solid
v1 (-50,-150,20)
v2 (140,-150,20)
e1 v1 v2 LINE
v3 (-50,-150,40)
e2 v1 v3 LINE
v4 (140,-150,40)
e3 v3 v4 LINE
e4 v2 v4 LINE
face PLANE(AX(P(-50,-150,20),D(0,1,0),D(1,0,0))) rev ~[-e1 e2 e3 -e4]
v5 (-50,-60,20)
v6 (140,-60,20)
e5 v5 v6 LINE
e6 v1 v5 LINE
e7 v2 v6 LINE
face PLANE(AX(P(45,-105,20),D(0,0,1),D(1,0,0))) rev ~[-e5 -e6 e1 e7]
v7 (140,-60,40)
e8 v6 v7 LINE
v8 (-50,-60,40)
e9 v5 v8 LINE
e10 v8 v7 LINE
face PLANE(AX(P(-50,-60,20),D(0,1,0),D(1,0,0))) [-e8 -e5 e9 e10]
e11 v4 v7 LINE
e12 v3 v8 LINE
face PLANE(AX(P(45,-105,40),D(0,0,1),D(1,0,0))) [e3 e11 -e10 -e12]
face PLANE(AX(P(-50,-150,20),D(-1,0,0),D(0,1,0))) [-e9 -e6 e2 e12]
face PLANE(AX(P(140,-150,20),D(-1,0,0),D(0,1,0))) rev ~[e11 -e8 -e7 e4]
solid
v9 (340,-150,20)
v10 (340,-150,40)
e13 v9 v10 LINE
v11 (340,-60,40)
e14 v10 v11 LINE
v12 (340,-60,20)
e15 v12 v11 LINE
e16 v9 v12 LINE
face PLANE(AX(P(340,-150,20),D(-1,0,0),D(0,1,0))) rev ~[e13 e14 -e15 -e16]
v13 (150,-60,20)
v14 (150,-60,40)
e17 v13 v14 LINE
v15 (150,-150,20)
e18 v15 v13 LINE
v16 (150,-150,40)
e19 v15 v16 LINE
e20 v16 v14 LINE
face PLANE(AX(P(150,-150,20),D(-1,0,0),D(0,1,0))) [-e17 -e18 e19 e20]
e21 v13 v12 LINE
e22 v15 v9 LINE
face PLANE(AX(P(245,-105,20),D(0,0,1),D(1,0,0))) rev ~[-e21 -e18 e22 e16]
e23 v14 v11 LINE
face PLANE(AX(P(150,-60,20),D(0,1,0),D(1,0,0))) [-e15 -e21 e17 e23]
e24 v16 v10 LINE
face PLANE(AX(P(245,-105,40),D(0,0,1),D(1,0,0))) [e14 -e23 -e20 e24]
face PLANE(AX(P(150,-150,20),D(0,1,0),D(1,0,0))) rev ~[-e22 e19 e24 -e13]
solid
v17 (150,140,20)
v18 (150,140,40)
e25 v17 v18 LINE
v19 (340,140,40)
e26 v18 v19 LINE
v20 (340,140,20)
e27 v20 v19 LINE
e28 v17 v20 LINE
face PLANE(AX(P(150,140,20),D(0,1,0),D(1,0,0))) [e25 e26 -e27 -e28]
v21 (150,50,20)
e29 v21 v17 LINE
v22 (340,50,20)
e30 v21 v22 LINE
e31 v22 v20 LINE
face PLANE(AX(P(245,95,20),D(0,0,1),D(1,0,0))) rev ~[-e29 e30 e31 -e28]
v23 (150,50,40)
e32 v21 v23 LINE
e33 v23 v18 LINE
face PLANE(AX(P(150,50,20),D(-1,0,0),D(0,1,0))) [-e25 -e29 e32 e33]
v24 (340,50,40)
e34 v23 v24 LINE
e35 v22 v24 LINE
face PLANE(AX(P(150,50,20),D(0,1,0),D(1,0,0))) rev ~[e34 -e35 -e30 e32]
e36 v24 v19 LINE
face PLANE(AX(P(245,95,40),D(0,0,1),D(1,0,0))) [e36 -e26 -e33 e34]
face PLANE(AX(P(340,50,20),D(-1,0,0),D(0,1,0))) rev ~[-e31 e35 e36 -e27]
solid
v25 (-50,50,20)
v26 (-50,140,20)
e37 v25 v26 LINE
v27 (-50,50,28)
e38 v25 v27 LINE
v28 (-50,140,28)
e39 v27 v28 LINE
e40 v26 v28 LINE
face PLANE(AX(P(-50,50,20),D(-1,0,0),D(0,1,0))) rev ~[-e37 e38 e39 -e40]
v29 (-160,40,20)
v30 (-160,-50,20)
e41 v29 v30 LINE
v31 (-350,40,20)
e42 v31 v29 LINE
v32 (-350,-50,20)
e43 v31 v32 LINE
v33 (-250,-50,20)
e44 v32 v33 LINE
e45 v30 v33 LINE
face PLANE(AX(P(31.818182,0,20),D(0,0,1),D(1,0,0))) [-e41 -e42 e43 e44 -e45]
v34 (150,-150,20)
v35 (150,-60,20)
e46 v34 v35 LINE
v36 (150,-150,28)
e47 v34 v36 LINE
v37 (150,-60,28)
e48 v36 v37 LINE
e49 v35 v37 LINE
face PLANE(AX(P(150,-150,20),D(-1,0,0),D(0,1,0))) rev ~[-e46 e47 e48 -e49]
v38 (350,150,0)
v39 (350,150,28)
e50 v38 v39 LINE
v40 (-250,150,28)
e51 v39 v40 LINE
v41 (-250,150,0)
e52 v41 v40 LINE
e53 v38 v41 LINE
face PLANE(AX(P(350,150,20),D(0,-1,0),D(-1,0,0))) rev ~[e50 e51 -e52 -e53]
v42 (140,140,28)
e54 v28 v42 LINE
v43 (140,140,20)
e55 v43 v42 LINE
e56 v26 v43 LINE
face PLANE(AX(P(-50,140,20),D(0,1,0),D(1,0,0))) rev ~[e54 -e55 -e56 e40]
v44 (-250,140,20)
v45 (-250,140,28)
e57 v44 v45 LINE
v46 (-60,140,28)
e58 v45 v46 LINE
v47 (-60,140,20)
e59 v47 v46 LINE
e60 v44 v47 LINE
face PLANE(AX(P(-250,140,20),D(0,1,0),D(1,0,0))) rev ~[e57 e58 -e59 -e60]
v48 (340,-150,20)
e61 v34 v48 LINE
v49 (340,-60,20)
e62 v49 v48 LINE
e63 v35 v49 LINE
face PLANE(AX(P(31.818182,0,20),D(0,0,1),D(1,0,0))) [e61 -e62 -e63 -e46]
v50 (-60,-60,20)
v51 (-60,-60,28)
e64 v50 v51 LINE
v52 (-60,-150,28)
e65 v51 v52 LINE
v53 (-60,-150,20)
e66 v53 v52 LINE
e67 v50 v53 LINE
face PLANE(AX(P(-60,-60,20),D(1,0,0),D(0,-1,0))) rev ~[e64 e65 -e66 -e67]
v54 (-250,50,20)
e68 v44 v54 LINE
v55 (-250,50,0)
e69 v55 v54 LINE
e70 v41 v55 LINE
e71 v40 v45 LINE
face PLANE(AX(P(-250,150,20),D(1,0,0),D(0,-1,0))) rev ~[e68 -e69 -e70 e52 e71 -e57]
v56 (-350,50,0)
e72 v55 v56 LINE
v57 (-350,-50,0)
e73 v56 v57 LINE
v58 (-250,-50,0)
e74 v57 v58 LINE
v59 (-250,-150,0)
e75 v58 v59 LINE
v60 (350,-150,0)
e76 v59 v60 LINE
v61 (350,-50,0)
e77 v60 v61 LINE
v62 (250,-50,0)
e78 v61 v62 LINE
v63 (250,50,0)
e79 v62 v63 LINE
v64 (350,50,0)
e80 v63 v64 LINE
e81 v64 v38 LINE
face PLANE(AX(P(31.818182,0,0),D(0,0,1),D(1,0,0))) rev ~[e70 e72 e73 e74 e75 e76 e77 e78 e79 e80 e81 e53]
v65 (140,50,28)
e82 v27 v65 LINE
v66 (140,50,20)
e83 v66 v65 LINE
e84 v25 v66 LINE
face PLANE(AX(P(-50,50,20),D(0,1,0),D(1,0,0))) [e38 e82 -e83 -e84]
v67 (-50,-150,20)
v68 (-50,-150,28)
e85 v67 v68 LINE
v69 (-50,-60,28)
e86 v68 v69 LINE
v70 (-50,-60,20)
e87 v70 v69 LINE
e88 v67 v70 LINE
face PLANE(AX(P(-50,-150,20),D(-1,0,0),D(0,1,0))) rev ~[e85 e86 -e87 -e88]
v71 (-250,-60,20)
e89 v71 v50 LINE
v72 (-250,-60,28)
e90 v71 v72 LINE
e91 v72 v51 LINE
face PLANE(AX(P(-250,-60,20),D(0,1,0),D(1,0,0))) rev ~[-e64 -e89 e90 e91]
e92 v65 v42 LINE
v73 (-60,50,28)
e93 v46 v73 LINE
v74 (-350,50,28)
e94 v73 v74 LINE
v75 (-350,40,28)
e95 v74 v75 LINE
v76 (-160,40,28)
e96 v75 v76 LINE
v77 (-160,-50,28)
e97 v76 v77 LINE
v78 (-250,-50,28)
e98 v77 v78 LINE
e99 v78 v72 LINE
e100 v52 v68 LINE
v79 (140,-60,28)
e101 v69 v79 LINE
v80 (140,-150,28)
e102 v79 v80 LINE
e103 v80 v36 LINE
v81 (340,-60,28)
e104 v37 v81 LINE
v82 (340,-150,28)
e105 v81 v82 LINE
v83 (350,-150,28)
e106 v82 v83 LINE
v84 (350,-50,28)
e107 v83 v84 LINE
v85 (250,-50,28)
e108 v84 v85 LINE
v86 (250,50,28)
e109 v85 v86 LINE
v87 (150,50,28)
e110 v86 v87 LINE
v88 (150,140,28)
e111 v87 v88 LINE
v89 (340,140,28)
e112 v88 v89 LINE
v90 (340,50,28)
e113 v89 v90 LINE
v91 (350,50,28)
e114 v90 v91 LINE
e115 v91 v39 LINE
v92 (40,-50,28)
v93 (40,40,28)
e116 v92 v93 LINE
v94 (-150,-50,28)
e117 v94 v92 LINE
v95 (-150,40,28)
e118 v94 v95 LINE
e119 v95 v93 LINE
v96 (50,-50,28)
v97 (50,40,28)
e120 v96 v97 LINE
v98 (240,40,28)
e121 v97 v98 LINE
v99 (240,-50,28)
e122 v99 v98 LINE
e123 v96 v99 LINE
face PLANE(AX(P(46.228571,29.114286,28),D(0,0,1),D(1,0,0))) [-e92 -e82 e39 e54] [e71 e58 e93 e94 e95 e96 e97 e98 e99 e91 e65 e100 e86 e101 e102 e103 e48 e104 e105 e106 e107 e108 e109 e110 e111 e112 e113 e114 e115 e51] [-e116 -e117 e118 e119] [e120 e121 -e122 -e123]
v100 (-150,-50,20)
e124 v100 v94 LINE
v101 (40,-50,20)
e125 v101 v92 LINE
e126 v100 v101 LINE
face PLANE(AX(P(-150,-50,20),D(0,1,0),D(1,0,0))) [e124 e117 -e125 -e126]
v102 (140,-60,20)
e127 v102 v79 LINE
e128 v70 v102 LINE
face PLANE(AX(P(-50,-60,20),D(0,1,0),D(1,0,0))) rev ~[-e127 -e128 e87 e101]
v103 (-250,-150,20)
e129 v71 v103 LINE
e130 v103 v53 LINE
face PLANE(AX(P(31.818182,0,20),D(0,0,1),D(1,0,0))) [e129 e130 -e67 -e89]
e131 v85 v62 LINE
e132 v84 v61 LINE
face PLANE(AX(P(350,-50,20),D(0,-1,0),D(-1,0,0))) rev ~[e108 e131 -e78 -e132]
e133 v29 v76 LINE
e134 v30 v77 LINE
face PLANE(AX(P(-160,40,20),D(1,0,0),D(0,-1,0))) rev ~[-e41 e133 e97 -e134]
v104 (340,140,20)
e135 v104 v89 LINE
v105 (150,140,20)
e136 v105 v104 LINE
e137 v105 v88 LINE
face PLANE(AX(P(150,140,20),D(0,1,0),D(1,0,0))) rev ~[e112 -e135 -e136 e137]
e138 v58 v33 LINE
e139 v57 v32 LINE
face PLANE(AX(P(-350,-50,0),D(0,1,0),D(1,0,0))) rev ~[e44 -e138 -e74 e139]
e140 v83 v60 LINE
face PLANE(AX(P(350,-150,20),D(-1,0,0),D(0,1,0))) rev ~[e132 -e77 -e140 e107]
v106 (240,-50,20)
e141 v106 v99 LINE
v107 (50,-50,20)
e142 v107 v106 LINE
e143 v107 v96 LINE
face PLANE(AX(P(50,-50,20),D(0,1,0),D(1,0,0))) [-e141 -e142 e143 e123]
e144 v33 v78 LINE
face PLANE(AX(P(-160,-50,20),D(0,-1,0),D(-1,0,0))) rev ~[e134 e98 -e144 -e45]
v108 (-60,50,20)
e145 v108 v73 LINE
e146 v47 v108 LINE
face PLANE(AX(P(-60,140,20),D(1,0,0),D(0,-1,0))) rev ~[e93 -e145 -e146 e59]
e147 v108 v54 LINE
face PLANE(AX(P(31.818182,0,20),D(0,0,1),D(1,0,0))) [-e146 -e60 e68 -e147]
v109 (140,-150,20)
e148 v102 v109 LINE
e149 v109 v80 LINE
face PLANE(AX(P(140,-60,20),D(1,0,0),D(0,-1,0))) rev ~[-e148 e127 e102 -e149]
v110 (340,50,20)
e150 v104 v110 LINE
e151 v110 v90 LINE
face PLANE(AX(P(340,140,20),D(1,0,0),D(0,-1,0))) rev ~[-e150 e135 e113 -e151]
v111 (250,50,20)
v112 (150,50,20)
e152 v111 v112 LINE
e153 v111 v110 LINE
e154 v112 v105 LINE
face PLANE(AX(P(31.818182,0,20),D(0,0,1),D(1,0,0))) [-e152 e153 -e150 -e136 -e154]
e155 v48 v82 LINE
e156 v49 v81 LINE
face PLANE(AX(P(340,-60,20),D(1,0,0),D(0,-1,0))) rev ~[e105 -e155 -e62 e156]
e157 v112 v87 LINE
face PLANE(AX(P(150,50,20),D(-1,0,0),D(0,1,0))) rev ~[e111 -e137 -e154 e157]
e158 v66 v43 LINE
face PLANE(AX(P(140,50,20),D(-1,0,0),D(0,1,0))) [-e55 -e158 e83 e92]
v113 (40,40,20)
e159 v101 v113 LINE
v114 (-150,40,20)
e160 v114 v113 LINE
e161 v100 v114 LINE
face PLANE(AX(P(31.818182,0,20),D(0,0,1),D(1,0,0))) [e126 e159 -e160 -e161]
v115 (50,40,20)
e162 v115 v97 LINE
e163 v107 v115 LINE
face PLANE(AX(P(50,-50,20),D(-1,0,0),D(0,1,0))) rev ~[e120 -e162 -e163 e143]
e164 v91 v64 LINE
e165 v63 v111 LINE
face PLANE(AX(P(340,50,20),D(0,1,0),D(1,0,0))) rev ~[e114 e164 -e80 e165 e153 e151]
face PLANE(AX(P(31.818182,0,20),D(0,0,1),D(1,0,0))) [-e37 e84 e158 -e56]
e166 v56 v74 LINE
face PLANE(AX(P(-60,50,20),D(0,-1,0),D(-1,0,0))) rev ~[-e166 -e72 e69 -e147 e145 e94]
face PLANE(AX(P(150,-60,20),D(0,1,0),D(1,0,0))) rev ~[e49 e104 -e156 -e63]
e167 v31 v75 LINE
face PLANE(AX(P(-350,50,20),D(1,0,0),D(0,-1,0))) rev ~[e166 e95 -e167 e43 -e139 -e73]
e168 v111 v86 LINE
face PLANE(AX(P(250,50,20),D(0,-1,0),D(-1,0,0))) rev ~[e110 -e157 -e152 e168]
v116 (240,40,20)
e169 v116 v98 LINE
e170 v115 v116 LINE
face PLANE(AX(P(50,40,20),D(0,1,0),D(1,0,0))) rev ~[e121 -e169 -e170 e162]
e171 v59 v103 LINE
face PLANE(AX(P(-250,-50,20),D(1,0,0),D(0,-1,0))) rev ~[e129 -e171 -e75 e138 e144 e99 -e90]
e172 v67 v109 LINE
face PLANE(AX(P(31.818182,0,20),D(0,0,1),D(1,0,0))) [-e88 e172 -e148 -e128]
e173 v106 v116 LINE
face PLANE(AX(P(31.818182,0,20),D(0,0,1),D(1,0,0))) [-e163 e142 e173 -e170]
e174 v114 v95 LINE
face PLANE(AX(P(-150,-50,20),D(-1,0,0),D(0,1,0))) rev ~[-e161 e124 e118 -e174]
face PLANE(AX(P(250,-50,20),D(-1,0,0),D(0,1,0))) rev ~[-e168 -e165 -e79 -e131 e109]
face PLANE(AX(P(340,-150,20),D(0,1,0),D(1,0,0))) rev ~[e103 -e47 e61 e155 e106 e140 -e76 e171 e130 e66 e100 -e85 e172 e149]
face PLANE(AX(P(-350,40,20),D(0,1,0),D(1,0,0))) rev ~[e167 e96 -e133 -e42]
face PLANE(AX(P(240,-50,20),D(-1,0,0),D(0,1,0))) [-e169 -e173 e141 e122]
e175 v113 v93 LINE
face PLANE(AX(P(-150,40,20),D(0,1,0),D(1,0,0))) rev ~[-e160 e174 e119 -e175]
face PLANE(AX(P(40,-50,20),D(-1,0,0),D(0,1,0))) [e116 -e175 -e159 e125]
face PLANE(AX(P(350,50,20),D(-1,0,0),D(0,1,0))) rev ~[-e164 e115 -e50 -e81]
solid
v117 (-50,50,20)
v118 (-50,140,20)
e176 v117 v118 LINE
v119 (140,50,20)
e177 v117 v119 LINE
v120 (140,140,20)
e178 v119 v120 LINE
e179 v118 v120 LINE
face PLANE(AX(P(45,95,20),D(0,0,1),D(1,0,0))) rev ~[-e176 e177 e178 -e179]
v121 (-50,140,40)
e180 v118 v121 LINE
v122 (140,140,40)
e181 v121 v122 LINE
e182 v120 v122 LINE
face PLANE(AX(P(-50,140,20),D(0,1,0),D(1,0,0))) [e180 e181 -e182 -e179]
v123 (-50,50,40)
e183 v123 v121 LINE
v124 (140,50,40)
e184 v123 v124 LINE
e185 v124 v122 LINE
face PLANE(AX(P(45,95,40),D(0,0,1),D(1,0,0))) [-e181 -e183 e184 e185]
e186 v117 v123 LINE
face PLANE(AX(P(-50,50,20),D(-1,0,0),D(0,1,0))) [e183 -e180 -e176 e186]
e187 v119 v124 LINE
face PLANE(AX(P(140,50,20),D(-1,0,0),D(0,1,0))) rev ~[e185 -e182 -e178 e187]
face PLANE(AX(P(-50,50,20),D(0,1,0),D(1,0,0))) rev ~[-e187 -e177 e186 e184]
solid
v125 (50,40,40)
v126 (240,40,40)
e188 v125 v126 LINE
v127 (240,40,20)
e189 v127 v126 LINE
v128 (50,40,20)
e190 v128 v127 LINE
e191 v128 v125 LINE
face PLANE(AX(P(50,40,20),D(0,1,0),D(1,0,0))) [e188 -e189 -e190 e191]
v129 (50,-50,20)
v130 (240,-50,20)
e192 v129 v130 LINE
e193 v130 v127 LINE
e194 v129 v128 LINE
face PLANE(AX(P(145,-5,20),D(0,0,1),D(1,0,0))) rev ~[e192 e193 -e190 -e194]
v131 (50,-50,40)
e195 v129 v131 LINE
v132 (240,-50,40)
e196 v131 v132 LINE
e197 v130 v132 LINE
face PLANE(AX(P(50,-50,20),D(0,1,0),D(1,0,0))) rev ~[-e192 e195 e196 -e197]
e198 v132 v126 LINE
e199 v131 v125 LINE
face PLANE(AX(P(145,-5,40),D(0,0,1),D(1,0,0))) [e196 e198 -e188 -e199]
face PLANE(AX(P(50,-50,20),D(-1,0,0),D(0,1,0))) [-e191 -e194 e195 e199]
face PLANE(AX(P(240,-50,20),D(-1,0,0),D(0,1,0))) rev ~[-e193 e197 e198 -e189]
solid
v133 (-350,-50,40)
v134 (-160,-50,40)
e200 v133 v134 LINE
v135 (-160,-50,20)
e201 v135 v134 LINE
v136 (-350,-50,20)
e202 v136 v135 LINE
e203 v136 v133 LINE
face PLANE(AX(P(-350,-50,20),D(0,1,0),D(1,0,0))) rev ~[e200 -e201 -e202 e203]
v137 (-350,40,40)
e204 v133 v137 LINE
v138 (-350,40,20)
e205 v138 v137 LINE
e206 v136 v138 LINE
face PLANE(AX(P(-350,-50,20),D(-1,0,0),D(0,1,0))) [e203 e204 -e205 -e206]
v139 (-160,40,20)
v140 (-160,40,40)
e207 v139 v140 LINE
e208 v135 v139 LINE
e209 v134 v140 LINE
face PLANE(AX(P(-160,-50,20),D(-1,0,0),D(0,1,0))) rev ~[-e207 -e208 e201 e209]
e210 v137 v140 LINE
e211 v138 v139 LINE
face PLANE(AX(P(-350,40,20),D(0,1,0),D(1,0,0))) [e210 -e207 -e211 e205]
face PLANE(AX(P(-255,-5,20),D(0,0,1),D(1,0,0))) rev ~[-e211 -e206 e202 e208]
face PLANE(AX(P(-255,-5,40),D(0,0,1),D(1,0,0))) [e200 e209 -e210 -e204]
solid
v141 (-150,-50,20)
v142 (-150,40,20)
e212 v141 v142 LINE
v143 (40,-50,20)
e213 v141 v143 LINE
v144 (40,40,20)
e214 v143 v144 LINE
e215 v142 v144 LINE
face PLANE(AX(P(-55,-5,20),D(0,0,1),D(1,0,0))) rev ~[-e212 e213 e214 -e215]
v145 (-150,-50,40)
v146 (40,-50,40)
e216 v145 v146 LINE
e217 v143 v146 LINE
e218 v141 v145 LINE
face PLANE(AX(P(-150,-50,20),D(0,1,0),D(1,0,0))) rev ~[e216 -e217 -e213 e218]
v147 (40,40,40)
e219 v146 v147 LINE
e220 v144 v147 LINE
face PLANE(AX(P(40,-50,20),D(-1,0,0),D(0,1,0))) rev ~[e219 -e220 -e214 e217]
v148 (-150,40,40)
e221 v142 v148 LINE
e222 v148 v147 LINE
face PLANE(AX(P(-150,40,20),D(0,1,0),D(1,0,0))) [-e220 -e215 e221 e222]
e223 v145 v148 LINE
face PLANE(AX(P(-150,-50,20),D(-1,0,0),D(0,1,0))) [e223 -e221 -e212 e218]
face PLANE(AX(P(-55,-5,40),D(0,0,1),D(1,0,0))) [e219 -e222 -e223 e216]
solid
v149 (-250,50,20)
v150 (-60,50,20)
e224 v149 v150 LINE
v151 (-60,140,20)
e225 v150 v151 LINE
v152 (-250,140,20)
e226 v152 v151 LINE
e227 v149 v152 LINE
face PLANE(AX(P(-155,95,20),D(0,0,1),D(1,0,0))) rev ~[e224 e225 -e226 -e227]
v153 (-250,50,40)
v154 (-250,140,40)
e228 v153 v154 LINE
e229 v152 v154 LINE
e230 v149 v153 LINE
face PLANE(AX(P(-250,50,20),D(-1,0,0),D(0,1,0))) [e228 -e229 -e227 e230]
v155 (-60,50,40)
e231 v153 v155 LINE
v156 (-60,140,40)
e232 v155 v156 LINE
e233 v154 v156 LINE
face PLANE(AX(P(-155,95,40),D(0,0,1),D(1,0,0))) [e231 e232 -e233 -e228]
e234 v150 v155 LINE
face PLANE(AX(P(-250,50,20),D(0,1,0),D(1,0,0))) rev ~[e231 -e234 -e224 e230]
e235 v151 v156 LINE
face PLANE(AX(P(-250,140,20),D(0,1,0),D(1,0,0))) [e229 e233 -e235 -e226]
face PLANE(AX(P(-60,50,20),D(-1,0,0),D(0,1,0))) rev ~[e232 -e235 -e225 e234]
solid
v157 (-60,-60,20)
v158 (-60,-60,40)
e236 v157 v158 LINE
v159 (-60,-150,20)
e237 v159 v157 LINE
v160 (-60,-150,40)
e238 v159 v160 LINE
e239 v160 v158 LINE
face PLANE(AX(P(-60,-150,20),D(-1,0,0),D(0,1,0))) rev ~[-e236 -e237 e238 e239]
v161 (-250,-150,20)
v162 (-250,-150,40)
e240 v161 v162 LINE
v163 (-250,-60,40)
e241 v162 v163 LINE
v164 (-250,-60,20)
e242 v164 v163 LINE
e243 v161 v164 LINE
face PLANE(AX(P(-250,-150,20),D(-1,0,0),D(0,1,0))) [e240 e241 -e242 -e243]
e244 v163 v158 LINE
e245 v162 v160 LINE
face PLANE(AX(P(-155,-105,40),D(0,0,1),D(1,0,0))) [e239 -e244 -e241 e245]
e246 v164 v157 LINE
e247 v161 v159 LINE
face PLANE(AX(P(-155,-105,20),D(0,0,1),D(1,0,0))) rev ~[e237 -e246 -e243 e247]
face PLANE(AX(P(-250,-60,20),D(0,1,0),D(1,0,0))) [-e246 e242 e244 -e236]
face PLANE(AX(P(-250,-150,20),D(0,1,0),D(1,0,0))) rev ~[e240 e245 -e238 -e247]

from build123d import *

# Parameters (mm, degrees)
F1_DEPTH = 20
F2_W     = 190
F2_H     = 90
F3_DEPTH = 20
F4_W     = 190
F4_H     = 90
F5_DEPTH = 8


with BuildPart() as f1:
    # F0 (on Top) → F1 (new body)
    with BuildSketch(Plane.XY):
        Polygon((-250, -150), (350, -150), (350, -50), (250, -50), (250, 50), (350, 50), (350, 150), (-250, 150), (-250, 50), (-350, 50), (-350, -50), (-250, -50), align=None)
    extrude(amount=F1_DEPTH)

    # F4 (on face) → F5 (join)
    with BuildSketch(Plane.XY.offset(20)):
        Polygon((350, 50), (350, 150), (-250, 150), (-250, 140), (-60, 140), (-60, 50), (-250, 50), (-350, 50), (-350, 40), (-160, 40), (-160, -50), (-250, -50), (-250, -60), (-60, -60), (-60, -150), (-50, -150), (-50, -60), (140, -60), (140, -150), (150, -150), (150, -60), (340, -60), (340, -150), (350, -150), (350, -50), (250, -50), (250, 50), (150, 50), (150, 140), (340, 140), (340, 50), align=None)
        with Locations((-55, -5)):
            Rectangle(F4_W, F4_H, mode=Mode.SUBTRACT)
        with Locations((145, -5)):
            Rectangle(F4_W, F4_H, mode=Mode.SUBTRACT)
        with Locations((45, 95)):
            Rectangle(F4_W, F4_H, mode=Mode.SUBTRACT)
    extrude(amount=F5_DEPTH)


with BuildPart() as f3:
    # F2 (on face) → F3 (new body)
    with BuildSketch(Plane.XY.offset(20)):
        with Locations((-255, -5)):
            Rectangle(F2_W, F2_H)
    extrude(amount=F3_DEPTH)


with BuildPart() as f3b:
    # F2 (on face) → F3, piece 2 (new body)
    with BuildSketch(Plane.XY.offset(20)):
        with Locations((-55, -5)):
            Rectangle(F2_W, F2_H)
    extrude(amount=F3_DEPTH)


with BuildPart() as f3c:
    # F2 (on face) → F3, piece 3 (new body)
    with BuildSketch(Plane.XY.offset(20)):
        with Locations((145, -5)):
            Rectangle(F2_W, F2_H)
    extrude(amount=F3_DEPTH)


with BuildPart() as f3d:
    # F2 (on face) → F3, piece 4 (new body)
    with BuildSketch(Plane.XY.offset(20)):
        with Locations((-155, 95)):
            Rectangle(F2_W, F2_H)
    extrude(amount=F3_DEPTH)


with BuildPart() as f3e:
    # F2 (on face) → F3, piece 5 (new body)
    with BuildSketch(Plane.XY.offset(20)):
        with Locations((45, 95)):
            Rectangle(F2_W, F2_H)
    extrude(amount=F3_DEPTH)


with BuildPart() as f3f:
    # F2 (on face) → F3, piece 6 (new body)
    with BuildSketch(Plane.XY.offset(20)):
        with Locations((245, 95)):
            Rectangle(F2_W, F2_H)
    extrude(amount=F3_DEPTH)


with BuildPart() as f3g:
    # F2 (on face) → F3, piece 7 (new body)
    with BuildSketch(Plane.XY.offset(20)):
        with Locations((-155, -105)):
            Rectangle(F2_W, F2_H)
    extrude(amount=F3_DEPTH)


with BuildPart() as f3h:
    # F2 (on face) → F3, piece 8 (new body)
    with BuildSketch(Plane.XY.offset(20)):
        with Locations((45, -105)):
            Rectangle(F2_W, F2_H)
    extrude(amount=F3_DEPTH)


with BuildPart() as f3i:
    # F2 (on face) → F3, piece 9 (new body)
    with BuildSketch(Plane.XY.offset(20)):
        with Locations((245, -105)):
            Rectangle(F2_W, F2_H)
    extrude(amount=F3_DEPTH)


solid = Compound([f1.part, f3.part, f3b.part, f3c.part, f3d.part, f3e.part, f3f.part, f3g.part, f3h.part, f3i.part])
